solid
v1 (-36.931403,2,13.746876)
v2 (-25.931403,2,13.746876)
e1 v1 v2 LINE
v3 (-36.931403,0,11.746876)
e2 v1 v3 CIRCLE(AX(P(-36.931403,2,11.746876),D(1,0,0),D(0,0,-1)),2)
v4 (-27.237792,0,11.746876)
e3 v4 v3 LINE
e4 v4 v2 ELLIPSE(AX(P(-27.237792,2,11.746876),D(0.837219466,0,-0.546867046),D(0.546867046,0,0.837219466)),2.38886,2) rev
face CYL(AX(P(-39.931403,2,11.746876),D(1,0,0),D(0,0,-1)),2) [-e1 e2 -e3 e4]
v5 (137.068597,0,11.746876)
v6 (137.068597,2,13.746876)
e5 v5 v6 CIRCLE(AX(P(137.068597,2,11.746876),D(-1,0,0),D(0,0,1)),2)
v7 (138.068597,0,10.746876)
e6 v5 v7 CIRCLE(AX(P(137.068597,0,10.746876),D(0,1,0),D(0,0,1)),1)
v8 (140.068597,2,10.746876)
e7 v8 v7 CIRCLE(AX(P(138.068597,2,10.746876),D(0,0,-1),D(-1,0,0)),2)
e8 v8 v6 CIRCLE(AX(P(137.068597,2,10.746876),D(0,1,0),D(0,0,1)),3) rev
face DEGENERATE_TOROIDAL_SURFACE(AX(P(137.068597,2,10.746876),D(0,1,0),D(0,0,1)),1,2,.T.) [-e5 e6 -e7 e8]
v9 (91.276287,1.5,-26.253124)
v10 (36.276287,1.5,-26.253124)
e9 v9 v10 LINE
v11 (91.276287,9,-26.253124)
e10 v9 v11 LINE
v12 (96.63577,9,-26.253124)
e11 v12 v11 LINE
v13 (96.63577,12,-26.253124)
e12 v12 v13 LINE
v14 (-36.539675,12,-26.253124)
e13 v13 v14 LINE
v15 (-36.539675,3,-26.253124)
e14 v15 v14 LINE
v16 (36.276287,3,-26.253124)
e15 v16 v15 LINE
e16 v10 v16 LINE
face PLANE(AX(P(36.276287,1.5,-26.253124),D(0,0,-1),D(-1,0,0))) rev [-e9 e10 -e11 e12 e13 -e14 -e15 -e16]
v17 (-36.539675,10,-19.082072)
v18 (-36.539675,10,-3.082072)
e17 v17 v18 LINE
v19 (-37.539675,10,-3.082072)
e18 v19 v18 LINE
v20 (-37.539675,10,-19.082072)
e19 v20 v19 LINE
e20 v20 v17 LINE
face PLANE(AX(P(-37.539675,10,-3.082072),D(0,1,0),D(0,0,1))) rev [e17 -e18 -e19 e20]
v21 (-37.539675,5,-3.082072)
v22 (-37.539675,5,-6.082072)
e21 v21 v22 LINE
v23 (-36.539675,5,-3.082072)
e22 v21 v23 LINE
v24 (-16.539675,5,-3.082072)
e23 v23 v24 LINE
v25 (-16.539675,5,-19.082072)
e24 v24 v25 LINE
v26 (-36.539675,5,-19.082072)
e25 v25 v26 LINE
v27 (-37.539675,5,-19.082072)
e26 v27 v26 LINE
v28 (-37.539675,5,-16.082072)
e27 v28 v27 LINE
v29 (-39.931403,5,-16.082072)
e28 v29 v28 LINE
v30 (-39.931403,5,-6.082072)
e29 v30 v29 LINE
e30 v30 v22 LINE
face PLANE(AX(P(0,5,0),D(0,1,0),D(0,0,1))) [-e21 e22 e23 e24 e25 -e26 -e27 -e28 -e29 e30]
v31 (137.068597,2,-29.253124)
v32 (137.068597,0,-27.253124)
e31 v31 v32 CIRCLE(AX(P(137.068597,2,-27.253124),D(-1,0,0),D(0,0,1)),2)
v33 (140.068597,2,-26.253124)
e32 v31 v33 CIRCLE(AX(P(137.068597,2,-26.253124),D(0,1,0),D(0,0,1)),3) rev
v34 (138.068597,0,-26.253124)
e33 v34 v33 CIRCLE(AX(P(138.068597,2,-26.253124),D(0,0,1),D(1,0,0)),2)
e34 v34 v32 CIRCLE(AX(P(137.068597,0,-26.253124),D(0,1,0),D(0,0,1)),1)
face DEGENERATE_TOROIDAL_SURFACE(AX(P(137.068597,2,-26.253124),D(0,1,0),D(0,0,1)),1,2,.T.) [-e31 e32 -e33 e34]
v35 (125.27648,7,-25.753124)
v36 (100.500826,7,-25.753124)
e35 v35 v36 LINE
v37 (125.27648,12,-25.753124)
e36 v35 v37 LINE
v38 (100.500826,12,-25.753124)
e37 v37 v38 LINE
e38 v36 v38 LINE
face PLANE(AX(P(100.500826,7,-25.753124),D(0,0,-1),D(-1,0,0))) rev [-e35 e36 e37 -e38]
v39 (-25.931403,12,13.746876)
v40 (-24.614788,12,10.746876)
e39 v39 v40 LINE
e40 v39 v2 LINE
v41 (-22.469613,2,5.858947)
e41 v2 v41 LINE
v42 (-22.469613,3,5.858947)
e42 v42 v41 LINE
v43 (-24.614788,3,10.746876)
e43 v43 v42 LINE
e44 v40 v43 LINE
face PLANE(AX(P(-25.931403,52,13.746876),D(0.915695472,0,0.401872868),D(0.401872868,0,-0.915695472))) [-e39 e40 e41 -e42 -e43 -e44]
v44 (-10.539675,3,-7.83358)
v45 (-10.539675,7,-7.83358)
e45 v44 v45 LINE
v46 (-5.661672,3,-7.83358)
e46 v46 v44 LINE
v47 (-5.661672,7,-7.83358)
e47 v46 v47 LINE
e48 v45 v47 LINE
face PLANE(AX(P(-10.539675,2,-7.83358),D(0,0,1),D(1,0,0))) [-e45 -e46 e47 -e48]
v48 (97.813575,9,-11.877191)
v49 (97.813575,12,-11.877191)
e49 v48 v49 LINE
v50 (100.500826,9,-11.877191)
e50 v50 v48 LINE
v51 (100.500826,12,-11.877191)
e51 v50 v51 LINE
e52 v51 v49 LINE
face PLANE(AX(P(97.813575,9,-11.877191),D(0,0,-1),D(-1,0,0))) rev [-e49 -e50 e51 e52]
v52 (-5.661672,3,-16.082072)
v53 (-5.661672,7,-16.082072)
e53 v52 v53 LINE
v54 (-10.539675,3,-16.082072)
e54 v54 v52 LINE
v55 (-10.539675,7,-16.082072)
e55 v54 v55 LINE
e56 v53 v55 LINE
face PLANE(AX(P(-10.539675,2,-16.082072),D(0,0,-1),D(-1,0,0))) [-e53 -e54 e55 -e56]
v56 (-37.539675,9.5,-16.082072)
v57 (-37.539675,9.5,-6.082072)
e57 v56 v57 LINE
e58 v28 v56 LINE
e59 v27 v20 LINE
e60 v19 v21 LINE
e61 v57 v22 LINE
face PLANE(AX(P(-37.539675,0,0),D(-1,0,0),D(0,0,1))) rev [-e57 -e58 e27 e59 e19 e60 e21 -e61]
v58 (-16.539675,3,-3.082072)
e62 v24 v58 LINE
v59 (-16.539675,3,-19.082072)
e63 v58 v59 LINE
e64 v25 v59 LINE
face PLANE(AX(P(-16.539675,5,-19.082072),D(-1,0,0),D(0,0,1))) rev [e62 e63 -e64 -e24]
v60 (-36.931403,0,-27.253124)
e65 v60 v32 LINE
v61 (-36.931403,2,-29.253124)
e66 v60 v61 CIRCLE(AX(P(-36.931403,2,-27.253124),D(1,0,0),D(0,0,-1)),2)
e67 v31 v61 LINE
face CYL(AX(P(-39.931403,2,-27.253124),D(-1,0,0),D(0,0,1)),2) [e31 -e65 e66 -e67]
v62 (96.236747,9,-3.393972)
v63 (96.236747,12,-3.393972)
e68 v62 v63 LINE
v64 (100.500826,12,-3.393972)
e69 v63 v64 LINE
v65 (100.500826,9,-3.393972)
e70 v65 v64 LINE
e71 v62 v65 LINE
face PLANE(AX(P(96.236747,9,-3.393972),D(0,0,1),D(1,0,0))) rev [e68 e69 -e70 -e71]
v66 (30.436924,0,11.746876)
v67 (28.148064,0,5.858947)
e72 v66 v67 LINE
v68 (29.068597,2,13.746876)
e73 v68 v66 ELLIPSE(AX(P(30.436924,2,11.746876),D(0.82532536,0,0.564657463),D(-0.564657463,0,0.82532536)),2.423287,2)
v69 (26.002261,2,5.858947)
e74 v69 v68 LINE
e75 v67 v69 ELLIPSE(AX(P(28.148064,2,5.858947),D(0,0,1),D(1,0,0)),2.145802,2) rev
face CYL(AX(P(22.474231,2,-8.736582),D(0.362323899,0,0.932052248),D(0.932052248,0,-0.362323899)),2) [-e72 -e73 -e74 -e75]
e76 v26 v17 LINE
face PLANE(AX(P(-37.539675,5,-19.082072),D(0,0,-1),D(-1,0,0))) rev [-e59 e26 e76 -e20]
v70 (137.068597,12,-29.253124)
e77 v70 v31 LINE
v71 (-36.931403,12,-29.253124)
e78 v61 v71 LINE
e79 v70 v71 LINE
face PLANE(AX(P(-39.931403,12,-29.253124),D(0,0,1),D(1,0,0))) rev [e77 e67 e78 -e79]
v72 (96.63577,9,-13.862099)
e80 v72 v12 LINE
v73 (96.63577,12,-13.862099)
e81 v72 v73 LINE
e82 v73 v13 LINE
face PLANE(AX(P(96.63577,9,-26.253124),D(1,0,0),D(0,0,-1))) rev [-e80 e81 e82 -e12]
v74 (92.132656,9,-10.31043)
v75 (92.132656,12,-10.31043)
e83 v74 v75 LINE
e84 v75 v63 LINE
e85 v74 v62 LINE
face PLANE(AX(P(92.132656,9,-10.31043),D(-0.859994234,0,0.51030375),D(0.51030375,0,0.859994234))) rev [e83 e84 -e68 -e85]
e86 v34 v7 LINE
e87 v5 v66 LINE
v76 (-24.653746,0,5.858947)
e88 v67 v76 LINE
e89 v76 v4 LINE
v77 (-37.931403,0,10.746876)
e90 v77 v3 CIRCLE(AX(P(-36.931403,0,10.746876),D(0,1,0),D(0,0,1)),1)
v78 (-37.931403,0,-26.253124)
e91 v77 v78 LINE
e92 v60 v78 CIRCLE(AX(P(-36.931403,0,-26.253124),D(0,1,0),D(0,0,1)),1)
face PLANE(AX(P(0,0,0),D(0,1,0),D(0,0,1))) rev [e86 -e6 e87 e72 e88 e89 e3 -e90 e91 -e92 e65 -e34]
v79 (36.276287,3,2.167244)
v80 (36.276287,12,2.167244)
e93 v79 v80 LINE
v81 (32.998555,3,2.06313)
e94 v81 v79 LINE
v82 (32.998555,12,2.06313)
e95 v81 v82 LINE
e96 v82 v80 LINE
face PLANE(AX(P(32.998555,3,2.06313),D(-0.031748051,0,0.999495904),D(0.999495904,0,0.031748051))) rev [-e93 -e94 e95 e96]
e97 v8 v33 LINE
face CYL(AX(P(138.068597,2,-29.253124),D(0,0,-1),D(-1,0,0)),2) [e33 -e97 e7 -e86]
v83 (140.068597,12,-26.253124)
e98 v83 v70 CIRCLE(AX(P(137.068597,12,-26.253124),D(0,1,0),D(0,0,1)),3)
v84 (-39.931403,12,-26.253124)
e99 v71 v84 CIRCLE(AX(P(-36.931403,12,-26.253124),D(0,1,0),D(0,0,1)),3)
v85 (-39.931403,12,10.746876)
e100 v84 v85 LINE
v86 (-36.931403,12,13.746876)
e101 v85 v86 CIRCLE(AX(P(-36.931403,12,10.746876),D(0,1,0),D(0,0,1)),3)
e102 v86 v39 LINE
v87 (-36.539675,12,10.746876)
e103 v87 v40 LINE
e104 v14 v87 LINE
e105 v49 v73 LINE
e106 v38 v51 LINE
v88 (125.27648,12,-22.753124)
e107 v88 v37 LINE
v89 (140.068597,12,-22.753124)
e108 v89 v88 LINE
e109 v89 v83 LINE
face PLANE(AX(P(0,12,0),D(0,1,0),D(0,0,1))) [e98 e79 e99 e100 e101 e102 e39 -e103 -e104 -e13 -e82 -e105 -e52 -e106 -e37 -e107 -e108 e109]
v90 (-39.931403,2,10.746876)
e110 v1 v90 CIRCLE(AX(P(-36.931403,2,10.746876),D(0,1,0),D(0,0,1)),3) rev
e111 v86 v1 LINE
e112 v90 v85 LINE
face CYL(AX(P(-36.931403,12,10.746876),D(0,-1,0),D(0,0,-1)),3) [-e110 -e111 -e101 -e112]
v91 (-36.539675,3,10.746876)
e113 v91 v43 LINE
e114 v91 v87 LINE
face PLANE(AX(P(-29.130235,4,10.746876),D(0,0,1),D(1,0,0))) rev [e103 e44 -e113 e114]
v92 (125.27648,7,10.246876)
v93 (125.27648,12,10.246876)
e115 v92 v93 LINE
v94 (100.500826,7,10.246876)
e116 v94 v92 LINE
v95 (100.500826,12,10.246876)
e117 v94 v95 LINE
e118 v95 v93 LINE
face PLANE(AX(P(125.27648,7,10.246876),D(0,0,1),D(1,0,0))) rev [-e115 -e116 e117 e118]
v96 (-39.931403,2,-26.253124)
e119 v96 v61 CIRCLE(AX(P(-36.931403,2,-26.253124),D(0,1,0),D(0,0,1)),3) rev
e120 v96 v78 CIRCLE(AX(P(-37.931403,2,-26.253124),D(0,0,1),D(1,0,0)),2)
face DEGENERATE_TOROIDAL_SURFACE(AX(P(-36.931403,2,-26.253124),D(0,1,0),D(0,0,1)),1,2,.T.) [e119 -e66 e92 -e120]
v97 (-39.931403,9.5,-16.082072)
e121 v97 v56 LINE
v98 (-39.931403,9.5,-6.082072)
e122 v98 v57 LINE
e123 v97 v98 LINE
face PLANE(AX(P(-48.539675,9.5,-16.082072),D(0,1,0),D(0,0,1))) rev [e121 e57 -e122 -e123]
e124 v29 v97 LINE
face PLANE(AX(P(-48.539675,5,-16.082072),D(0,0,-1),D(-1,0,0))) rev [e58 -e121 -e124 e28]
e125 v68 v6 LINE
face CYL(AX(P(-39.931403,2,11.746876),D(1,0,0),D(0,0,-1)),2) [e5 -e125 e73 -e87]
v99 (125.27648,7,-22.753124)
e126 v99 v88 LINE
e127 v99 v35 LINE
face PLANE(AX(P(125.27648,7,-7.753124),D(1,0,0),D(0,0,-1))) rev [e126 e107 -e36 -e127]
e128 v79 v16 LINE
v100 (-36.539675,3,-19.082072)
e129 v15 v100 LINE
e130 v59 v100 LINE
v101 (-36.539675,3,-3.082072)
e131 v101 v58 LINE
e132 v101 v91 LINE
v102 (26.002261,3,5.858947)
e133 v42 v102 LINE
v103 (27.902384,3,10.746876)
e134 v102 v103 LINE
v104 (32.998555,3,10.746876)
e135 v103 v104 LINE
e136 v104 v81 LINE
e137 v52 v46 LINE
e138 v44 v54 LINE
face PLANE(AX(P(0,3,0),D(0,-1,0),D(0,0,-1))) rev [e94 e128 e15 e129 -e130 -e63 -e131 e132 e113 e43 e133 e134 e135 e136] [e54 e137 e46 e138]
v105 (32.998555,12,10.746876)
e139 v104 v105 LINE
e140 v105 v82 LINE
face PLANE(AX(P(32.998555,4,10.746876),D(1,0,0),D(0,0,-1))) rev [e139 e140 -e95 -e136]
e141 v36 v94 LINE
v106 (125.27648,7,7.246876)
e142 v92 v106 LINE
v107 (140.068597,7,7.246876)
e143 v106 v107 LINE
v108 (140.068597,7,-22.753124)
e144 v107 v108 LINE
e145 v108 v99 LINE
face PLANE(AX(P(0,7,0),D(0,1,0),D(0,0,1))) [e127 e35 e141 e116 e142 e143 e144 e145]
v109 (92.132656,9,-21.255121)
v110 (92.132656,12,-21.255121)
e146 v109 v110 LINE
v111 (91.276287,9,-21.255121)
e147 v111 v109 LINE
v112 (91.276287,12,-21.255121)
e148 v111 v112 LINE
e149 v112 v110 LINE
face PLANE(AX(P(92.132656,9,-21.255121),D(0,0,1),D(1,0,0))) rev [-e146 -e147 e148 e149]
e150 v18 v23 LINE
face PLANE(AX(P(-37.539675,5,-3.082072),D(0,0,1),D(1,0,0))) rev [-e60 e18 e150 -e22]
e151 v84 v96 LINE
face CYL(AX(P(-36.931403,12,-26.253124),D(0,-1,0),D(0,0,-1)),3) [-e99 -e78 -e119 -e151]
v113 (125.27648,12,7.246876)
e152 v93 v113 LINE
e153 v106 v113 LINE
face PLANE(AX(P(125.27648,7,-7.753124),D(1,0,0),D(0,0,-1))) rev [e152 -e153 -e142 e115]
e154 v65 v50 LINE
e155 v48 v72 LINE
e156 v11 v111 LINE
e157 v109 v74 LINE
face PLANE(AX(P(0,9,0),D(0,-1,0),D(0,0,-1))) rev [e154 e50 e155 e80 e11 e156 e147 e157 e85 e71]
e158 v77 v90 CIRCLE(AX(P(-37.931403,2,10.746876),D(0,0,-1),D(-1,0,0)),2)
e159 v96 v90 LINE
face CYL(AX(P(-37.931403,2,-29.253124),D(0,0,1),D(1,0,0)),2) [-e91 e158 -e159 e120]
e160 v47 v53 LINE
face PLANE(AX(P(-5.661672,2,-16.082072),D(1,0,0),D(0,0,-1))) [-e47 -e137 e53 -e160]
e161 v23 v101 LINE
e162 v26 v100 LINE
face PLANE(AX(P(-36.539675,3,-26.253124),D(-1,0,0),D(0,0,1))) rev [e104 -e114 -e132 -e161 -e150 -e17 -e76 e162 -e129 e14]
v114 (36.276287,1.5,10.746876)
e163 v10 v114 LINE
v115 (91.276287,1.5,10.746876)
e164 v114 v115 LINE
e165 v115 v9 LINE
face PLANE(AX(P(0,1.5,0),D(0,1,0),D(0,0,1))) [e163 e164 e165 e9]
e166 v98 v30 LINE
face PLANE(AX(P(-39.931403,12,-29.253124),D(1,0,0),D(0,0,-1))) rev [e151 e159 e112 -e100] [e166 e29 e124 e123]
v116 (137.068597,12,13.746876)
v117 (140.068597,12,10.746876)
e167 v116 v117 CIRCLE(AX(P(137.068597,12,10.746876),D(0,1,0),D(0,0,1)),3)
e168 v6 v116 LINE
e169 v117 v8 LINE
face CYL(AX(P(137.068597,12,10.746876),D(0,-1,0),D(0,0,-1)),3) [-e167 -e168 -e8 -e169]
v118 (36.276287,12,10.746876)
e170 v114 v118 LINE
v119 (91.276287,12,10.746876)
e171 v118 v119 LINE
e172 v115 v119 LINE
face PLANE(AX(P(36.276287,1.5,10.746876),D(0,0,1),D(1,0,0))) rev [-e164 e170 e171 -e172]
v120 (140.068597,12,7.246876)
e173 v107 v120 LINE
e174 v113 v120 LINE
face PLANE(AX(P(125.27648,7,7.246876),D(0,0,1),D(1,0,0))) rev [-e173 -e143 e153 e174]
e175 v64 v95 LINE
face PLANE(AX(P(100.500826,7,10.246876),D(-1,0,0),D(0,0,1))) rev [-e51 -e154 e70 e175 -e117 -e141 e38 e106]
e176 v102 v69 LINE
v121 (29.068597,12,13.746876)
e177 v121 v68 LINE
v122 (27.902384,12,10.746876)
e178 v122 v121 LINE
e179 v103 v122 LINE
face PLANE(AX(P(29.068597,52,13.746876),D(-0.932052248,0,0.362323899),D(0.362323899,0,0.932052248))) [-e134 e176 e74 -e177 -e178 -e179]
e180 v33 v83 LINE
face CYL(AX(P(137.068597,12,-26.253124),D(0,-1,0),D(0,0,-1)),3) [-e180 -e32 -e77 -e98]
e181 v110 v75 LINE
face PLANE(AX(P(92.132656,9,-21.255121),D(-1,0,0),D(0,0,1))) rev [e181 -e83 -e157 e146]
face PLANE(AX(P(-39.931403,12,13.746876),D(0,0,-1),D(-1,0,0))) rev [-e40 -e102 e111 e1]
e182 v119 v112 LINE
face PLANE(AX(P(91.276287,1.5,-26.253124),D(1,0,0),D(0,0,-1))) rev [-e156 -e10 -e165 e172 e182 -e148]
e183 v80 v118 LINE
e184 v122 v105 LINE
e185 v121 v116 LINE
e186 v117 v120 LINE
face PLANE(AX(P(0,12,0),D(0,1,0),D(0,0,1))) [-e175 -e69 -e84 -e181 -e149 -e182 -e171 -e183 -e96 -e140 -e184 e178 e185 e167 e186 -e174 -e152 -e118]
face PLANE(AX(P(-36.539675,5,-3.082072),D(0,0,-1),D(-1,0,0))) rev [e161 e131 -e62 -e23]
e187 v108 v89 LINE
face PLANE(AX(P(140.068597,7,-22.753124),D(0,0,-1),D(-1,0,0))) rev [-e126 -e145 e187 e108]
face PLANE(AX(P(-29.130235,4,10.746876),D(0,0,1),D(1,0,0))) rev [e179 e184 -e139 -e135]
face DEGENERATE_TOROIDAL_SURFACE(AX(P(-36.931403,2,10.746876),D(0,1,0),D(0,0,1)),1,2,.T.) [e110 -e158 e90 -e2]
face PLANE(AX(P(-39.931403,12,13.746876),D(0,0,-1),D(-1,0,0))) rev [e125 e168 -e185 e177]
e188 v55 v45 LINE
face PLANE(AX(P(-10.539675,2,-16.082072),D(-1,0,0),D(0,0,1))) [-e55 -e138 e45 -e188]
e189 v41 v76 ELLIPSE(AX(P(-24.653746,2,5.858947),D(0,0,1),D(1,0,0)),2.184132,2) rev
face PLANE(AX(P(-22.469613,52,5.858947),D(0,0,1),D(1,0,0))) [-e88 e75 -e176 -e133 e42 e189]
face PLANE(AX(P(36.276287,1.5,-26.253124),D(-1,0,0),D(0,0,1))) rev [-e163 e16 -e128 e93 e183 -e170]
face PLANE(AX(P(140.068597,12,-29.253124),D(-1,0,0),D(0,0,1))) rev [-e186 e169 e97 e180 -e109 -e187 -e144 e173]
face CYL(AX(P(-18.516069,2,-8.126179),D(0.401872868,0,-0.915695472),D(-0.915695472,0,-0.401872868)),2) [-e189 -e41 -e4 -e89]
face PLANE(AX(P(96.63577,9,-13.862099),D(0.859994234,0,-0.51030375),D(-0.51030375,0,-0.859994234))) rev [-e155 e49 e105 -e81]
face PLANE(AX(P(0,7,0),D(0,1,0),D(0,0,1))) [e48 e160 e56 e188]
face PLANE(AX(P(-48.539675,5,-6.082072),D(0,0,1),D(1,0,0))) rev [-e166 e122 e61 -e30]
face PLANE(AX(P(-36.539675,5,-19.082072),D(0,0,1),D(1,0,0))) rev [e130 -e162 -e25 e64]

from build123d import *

# Parameters (mm, degrees)
SKETCH_3_W           = 180
SKETCH_3_H           = 43
EXTRUDE_1_DEPTH      = 12
CUT_EXTRUDE_1_DEPTH  = 52
CUT_EXTRUDE_2_DEPTH  = 5
CUT_EXTRUDE_3_DEPTH  = 5
SKETCH_8_W           = 55
SKETCH_8_H           = 37
CUT_EXTRUDE_4_DEPTH  = 10.5
CUT_EXTRUDE_5_DEPTH  = 3
SKETCH_10_W          = 62.128790526
SKETCH_10_H          = 8.683746703
CUT_EXTRUDE_6_DEPTH  = 8
CUT_EXTRUDE_8_DEPTH  = 9
FILLET_2_R           = 2
FILLET_3_R           = 3
SKETCH_12_W          = 20
SKETCH_12_H          = 16
EXTRUDE_2_DEPTH      = 2
SKETCH_13_W          = 16
SKETCH_13_H          = 5
CUT_EXTRUDE_9_DEPTH  = 1
SKETCH_14_W          = 10
SKETCH_14_H          = 4.5
CUT_EXTRUDE_10_DEPTH = 11
EXTRUDE_3_DEPTH      = 2
EXTRUDE_3_DEPTH_BACK = 3
SKETCH_15_W          = 4.878003414
SKETCH_15_H          = 8.248491994


with BuildPart() as part:
    # 草图3 → 凸台-拉伸1 (new body)
    with BuildSketch(Plane(origin=(0, 0, 0), x_dir=(1, 0, 0), z_dir=(0, 1, 0))):
        with Locations((50.068597249, 7.753123643)):
            Rectangle(SKETCH_3_W, SKETCH_3_H)
    extrude(amount=EXTRUDE_1_DEPTH)

    # 草图4 → 切除-拉伸1 (cut)
    with BuildSketch(Plane(origin=(0, 0, 0), x_dir=(1, 0, 0), z_dir=(0, 1, 0))):
        Polygon((-22.469613434, -5.858946979), (26.002261286, -5.858946979), (29.068597249, -13.746876357), (-25.931402751, -13.746876357), align=None)
    extrude(amount=CUT_EXTRUDE_1_DEPTH, mode=Mode.SUBTRACT)

    # 草图5 → 切除-拉伸2 (cut)
    with BuildSketch(Plane(origin=(0, 12, 0), x_dir=(1, 0, 0), z_dir=(0, 1, 0))):
        Polygon((140.068597249, 7.753123643), (140.068597249, 22.753123643), (125.276479966, 22.753123643), (125.276479966, -7.246876357), (140.068597249, -7.246876357), align=None)
    extrude(amount=-CUT_EXTRUDE_2_DEPTH, mode=Mode.SUBTRACT)

    # 草图7 → 切除-拉伸3 (cut)
    with BuildSketch(Plane(origin=(0, 12, 0), x_dir=(1, 0, 0), z_dir=(0, 1, 0))):
        Polygon((125.276479966, 7.753123643), (125.276479966, 25.753123643), (100.500825538, 25.753123643), (100.500825538, -10.246876357), (125.276479966, -10.246876357), align=None)
    extrude(amount=-CUT_EXTRUDE_3_DEPTH, mode=Mode.SUBTRACT)

    # 草图8 → 切除-拉伸4 (cut)
    with BuildSketch(Plane(origin=(0, 12, 0), x_dir=(1, 0, 0), z_dir=(0, 1, 0))):
        with Locations((63.776287419, 7.753123643)):
            Rectangle(SKETCH_8_W, SKETCH_8_H)
    extrude(amount=-CUT_EXTRUDE_4_DEPTH, mode=Mode.SUBTRACT)

    # 草图9 → 切除-拉伸5 (cut)
    with BuildSketch(Plane(origin=(0, 12, 0), x_dir=(1, 0, 0), z_dir=(0, 1, 0))):
        Polygon((91.276287419, 26.253123643), (96.635770173, 26.253123643), (96.635770173, 22.130591531), (96.635770173, 13.862098754), (97.813575381, 11.877191358), (100.500825538, 11.877191358), (100.500825538, 3.393971617), (96.236747254, 3.393971617), (92.132656028, 10.310430274), (92.132656028, 21.255120764), (91.276287419, 21.255120764), align=None)
    extrude(amount=-CUT_EXTRUDE_5_DEPTH, mode=Mode.SUBTRACT)

    # 草图10 → 切除-拉伸6 (cut)
    with BuildSketch(Plane(origin=(0, 12, 0), x_dir=(1, 0, 0), z_dir=(0, 1, 0))):
        with Locations((1.934159822, -6.405003006)):
            Rectangle(SKETCH_10_W, SKETCH_10_H)
    extrude(amount=-CUT_EXTRUDE_6_DEPTH, mode=Mode.SUBTRACT)

    # 草图11 → 切除-拉伸8 (cut)
    with BuildSketch(Plane(origin=(0, 12, 0), x_dir=(1, 0, 0), z_dir=(0, 1, 0))):
        Polygon((32.998555085, -10.746876357), (-36.5396752, -10.746876357), (-36.5396752, 26.253123643), (36.276287419, 26.253123643), (36.276287419, -2.167243749), (32.998555085, -2.063129654), align=None)
    extrude(amount=-CUT_EXTRUDE_8_DEPTH, mode=Mode.SUBTRACT)

    # 圆角2
    fillet_2_edges = [part.edges().sort_by_distance(p)[0] for p in [
        (84.568597249, 0, 13.746876357),
        (-24.200508092, 0, 9.802911668),
        (27.535429268, 0, 9.802911668),
        (50.068597249, 0, -29.253123643),
        (140.068597249, 0, -7.753123643),
        (-32.931402751, 0, 13.746876357),
        (-39.931402751, 0, -7.753123643),
    ]]
    fillet(fillet_2_edges, radius=FILLET_2_R)

    # 圆角3
    # the kernel refuses this fillet: 3 mm, written as the material it takes off along each edge
    with BuildSketch(Plane(origin=(-36.931402751, 0, 10.746876357), x_dir=(0, 0, 1), z_dir=(1, 0, 0))) as fillet_3_piece_1:
        with BuildLine():
            CenterArc((1, -2), 2, 0, 90)
            Line((3, -2), (3, 0))
            Line((3, 0), (1, 0))
        make_face()
    revolve(axis=Axis((-36.931402751, 0, 10.746876357), (0, -1, 0)), revolution_arc=90, mode=Mode.SUBTRACT)
    with BuildSketch(Plane(origin=(-36.931402751, 0, -26.253123643), x_dir=(-1, 0, 0), z_dir=(0, 0, 1))) as fillet_3_piece_2:
        with BuildLine():
            CenterArc((1, -2), 2, 0, 90)
            Line((3, -2), (3, 0))
            Line((3, 0), (1, 0))
        make_face()
    revolve(axis=Axis((-36.931402751, 0, -26.253123643), (0, -1, 0)), revolution_arc=90, mode=Mode.SUBTRACT)
    with BuildSketch(Plane(origin=(137.068597249, 0, 10.746876357), x_dir=(1, 0, 0), z_dir=(0, 0, -1))) as fillet_3_piece_3:
        with BuildLine():
            CenterArc((1, -2), 2, 0, 90)
            Line((3, -2), (3, 0))
            Line((3, 0), (1, 0))
        make_face()
    revolve(axis=Axis((137.068597249, 0, 10.746876357), (0, -1, 0)), revolution_arc=90, mode=Mode.SUBTRACT)
    with BuildSketch(Plane(origin=(137.068597249, 0, -26.253123643), x_dir=(0, 0, -1), z_dir=(-1, 0, 0))) as fillet_3_piece_4:
        with BuildLine():
            CenterArc((1, -2), 2, 0, 90)
            Line((3, -2), (3, 0))
            Line((3, 0), (1, 0))
        make_face()
    revolve(axis=Axis((137.068597249, 0, -26.253123643), (0, -1, 0)), revolution_arc=90, mode=Mode.SUBTRACT)
    with BuildSketch(Plane(origin=(-39.931402751, 0, -29.253123643), x_dir=(1, 0, 0), z_dir=(0, 1, 0))) as fillet_3_piece_5:
        with BuildLine():
            CenterArc((FILLET_3_R, -FILLET_3_R), FILLET_3_R, 90, 90)
            Line((0, -FILLET_3_R), (0, 0))
            Line((0, 0), (FILLET_3_R, 0))
        make_face()
    extrude(amount=19.5, mode=Mode.SUBTRACT)
    with BuildSketch(Plane(origin=(140.068597249, 0, -29.253123643), x_dir=(-1, 0, 0), z_dir=(0, 1, 0)), Plane(origin=(140.068597249, 0, 13.746876357), x_dir=(0, 0, -1), z_dir=(0, 1, 0)), Plane(origin=(-39.931402751, 0, 13.746876357), x_dir=(1, 0, 0), z_dir=(0, 1, 0))) as fillet_3_piece_6:
        with BuildLine():
            CenterArc((FILLET_3_R, FILLET_3_R), FILLET_3_R, 180, 90)
            Line((0, FILLET_3_R), (0, 0))
            Line((0, 0), (FILLET_3_R, 0))
        make_face()
    extrude(amount=19.5, mode=Mode.SUBTRACT)

    # 草图12 → 凸台-拉伸2 (add)
    with BuildSketch(Plane(origin=(0, 3, 0), x_dir=(1, 0, 0), z_dir=(0, 1, 0))):
        with Locations((-26.5396752, 11.082072108)):
            Rectangle(SKETCH_12_W, SKETCH_12_H)
    extrude(amount=EXTRUDE_2_DEPTH)

    # 草图13 → 切除-拉伸9 (cut)
    with BuildSketch(Plane(origin=(-36.5396752, 0, 0), x_dir=(0, 0, -1), z_dir=(1, 0, 0))):
        with Locations((11.082072108, 7.5)):
            Rectangle(SKETCH_13_W, SKETCH_13_H)
    extrude(amount=-CUT_EXTRUDE_9_DEPTH, mode=Mode.SUBTRACT)

    # 草图14 → 切除-拉伸10 (cut)
    with BuildSketch(Plane(origin=(-37.5396752, 0, 0), x_dir=(0, 0, -1), z_dir=(1, 0, 0))):
        with Locations((11.082072108, 7.25)):
            Rectangle(SKETCH_14_W, SKETCH_14_H)
    extrude(amount=-CUT_EXTRUDE_10_DEPTH, mode=Mode.SUBTRACT)

    # 草图15 → 凸台-拉伸3 (add, two sides: drawn at the far end of the back side and taken through both)
    with BuildSketch(Plane(origin=(0, 5, 0), x_dir=(1, 0, 0), z_dir=(0, 1, 0)).offset(-EXTRUDE_3_DEPTH_BACK)):
        with Locations((-8.100673493, 11.957826111)):
            Rectangle(SKETCH_15_W, SKETCH_15_H)
    extrude(amount=EXTRUDE_3_DEPTH + EXTRUDE_3_DEPTH_BACK)


solid = part.part
